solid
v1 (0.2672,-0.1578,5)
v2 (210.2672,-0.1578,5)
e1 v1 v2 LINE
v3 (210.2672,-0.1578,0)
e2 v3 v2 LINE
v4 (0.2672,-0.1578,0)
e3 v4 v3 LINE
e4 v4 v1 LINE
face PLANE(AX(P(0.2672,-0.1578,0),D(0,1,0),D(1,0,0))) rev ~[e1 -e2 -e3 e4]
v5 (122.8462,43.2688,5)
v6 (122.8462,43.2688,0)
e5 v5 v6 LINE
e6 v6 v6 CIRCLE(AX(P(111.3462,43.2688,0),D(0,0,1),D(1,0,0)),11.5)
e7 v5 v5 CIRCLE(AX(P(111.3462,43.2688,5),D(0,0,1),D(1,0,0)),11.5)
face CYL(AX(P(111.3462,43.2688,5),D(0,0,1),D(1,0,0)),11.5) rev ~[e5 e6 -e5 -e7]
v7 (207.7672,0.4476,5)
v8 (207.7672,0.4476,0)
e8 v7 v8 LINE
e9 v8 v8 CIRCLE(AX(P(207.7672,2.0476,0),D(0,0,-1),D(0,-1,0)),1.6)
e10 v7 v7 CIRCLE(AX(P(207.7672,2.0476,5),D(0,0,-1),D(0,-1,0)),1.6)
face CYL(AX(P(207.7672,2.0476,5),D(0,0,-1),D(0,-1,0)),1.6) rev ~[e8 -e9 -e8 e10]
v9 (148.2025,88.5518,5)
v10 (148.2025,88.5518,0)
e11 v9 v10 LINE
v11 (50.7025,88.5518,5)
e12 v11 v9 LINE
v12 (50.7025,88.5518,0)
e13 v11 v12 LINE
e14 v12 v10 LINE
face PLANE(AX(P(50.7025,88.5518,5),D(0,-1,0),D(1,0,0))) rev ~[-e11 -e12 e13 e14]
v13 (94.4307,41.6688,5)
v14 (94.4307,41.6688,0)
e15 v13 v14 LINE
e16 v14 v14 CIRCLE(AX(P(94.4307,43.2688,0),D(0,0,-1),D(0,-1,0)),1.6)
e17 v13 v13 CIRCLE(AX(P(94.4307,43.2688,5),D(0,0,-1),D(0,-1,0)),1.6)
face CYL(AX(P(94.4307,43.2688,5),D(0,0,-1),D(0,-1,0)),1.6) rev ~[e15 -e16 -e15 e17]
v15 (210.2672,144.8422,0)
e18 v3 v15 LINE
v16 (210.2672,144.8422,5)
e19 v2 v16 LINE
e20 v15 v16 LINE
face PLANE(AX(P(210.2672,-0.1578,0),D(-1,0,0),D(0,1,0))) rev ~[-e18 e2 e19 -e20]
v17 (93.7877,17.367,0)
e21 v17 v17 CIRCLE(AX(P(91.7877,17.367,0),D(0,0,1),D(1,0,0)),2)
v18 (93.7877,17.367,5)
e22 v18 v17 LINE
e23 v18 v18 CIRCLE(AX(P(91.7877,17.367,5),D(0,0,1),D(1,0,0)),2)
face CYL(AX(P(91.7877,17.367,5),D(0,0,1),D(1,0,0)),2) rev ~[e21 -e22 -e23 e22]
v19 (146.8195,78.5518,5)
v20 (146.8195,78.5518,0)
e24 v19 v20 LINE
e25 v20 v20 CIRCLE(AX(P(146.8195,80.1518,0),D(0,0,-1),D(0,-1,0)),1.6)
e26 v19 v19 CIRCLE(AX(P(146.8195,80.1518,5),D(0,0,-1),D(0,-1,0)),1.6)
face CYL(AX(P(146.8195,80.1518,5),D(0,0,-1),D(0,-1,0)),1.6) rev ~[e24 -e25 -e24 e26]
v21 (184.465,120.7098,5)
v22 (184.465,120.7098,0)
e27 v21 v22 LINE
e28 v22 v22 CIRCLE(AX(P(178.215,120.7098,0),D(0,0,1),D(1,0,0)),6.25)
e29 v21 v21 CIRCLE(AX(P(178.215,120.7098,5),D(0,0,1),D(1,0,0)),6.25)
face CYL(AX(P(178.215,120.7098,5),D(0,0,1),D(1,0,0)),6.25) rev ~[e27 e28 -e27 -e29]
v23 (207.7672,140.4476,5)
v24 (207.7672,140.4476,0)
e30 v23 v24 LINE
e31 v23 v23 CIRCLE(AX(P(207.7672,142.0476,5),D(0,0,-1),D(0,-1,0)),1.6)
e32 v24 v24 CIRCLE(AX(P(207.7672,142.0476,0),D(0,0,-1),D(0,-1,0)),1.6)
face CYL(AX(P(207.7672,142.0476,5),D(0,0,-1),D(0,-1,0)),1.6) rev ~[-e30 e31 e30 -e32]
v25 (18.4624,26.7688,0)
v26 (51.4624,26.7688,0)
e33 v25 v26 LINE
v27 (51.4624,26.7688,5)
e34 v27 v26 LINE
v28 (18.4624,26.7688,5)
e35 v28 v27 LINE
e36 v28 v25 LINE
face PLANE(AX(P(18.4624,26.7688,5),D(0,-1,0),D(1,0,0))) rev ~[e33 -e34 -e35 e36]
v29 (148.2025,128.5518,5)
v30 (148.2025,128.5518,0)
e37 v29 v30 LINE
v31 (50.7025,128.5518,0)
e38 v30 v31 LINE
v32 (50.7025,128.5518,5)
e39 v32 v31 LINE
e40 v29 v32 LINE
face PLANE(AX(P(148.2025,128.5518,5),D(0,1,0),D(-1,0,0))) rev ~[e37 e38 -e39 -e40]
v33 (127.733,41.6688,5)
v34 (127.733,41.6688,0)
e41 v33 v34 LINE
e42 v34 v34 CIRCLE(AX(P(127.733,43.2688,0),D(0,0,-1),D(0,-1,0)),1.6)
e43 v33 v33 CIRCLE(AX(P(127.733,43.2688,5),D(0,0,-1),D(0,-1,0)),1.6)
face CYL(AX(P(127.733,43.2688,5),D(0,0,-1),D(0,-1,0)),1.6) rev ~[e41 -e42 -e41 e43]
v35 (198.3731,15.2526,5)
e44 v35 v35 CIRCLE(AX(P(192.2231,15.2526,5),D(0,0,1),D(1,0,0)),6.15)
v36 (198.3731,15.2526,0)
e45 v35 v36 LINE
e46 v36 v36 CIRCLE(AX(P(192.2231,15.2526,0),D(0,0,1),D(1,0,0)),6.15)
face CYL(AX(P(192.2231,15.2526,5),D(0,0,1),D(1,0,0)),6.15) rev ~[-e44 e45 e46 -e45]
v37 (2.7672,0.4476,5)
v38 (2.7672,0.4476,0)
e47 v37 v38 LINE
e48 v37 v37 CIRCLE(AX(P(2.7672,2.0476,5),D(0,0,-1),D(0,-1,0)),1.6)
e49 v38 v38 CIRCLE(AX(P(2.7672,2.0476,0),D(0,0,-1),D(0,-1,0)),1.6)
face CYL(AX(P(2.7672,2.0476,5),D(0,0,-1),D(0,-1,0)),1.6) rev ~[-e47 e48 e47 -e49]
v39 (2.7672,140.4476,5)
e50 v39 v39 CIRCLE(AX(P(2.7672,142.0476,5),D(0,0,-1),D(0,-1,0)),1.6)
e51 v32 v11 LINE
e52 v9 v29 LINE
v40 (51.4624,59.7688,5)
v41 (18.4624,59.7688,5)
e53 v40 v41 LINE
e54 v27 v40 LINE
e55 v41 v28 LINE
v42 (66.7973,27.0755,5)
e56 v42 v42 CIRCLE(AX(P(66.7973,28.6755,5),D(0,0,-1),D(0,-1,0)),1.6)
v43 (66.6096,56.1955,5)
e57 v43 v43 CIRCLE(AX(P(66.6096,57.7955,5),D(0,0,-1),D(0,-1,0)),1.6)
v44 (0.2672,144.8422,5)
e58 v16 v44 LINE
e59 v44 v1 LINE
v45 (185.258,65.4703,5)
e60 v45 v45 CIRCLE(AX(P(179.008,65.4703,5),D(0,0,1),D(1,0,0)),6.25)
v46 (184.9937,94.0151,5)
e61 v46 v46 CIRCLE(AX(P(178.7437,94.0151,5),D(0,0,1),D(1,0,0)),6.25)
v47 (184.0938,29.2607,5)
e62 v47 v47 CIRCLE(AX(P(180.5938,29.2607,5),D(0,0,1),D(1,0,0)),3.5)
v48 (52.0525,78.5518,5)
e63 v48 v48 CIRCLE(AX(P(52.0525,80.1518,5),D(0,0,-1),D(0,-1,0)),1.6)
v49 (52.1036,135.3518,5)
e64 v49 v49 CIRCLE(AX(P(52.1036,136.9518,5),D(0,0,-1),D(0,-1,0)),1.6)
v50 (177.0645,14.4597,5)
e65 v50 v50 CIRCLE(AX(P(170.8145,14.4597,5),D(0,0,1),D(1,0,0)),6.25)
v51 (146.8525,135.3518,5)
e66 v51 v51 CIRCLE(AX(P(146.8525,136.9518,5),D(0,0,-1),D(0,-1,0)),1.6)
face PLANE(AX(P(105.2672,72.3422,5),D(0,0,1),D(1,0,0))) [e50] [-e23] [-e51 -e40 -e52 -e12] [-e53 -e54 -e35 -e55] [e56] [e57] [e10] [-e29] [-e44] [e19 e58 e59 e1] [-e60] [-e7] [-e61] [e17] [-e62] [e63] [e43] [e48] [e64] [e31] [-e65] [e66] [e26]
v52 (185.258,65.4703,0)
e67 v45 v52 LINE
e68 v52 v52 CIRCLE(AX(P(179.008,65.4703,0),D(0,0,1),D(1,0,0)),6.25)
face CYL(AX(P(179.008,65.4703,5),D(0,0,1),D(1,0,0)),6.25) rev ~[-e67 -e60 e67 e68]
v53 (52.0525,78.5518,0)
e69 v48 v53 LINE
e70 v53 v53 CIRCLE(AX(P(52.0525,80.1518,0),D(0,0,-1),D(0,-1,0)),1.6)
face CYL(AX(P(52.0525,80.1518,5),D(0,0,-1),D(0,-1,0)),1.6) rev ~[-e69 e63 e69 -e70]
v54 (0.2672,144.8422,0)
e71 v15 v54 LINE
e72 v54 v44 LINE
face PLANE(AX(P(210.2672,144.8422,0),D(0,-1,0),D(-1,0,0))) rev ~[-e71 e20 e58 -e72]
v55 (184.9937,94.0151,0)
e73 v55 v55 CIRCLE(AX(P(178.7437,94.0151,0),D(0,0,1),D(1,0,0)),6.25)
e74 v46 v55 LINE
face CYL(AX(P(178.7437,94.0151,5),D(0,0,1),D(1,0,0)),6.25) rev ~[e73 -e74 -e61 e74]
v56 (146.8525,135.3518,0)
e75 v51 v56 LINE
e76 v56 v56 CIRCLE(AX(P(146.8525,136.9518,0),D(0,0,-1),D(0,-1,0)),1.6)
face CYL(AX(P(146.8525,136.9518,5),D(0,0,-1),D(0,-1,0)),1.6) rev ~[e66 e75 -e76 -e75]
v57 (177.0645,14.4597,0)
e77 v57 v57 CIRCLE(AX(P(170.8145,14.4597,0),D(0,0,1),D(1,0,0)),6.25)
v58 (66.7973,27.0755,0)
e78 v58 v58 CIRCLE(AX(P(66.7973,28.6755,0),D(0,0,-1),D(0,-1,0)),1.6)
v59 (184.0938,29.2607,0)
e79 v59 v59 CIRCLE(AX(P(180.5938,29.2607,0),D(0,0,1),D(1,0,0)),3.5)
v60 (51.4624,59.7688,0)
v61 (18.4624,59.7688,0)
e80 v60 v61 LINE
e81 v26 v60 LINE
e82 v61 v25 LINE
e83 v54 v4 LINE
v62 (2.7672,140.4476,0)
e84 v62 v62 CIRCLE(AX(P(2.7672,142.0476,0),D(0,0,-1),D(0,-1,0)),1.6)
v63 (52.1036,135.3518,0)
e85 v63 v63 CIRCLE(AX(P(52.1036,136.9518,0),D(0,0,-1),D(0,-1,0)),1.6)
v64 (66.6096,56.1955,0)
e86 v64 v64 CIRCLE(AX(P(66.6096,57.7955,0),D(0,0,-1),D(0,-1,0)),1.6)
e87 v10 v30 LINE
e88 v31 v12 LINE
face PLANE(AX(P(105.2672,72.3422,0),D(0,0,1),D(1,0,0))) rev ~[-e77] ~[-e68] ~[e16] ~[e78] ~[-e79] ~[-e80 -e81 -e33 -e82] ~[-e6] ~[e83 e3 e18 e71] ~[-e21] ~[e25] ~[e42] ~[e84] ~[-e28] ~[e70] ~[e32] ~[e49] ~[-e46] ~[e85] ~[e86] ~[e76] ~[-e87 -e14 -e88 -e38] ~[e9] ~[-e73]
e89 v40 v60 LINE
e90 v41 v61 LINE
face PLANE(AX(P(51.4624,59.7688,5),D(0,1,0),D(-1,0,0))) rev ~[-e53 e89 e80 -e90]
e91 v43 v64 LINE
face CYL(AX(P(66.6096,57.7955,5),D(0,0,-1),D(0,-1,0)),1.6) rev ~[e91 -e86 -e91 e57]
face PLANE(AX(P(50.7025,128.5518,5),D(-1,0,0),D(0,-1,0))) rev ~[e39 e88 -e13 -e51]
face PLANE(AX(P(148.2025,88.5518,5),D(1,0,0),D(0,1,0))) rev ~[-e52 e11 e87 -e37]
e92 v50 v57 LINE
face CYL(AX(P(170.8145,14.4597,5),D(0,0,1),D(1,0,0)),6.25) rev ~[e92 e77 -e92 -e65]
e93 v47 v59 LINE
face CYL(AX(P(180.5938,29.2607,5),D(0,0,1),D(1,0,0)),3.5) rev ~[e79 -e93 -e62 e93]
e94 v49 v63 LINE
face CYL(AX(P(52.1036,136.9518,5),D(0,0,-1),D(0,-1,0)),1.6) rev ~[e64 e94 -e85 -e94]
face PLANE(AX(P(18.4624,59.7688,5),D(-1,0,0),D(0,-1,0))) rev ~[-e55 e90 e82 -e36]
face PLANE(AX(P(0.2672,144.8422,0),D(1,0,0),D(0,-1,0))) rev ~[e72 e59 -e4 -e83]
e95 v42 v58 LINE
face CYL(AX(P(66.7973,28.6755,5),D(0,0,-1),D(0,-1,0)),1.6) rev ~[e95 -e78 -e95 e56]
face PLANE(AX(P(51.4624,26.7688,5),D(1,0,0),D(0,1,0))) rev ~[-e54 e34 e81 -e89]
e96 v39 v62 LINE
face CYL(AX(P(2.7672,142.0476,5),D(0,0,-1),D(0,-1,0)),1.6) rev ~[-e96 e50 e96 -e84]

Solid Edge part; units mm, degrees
sketch "Sketch1" plane through (0, 0, 0) normal (0, 0, 1) x (1, 0, 0)
  line L0 (210.2672, -0.1578) -> (210.2672, 144.8422)
  line L1 (210.2672, 144.8422) -> (0.2672, 144.8422)
  line L2 (0.2672, 144.8422) -> (0.2672, -0.1578)
  line L3 (0.2672, -0.1578) -> (210.2672, -0.1578)
extrude "Protrusion1" add sketch "Sketch1" along normal blind 5
hole "Hole_3" at (52.1036, 136.9518, 5) direction (0, 0, -1) diameter 3.2 depth 50.8
hole "Hole1" at (146.8525, 136.9518, 5) direction (0, 0, -1) diameter 3.2 depth 50.8
hole "Hole2" at (146.8195, 80.1518, 5) direction (0, 0, -1) diameter 3.2 depth 50.8
hole "Hole3" at (52.0525, 80.1518, 5) direction (0, 0, -1) diameter 3.2 depth 50.8
sketch "Sketch2" plane through (105.2672, 72.3422, 5) normal (0, 0, 1) x (1, 0, 0)
  line L0 (-54.5647, 16.2096) -> (42.9353, 16.2096)
  line L1 (42.9353, 16.2096) -> (42.9353, 56.2096)
  line L2 (42.9353, 56.2096) -> (-54.5647, 56.2096)
  line L3 (-54.5647, 56.2096) -> (-54.5647, 16.2096)
extrude "ExtrudedCutout_1" cut sketch "Sketch2" against normal blind 5
sketch "Sketch3" plane through (105.2672, 72.3422, 5) normal (0, 0, 1) x (1, 0, 0)
  circle A0 centre (86.9559, -57.0896) radius 6.15
extrude "ExtrudedCutout_2" cut sketch "Sketch3" against normal blind 5
sketch "Sketch4" plane through (105.2672, 72.3422, 5) normal (0, 0, 1) x (1, 0, 0)
  circle A0 centre (65.5473, -57.8825) radius 6.25
extrude "ExtrudedCutout_3" cut sketch "Sketch4" against normal blind 5
sketch "Sketch5" plane through (105.2672, 72.3422, 5) normal (0, 0, 1) x (1, 0, 0)
  circle A0 centre (75.3266, -43.0815) radius 3.5
extrude "ExtrudedCutout_4" cut sketch "Sketch5" against normal blind 5
hole "Hole_7" at (66.6096, 57.7955, 5) direction (0, 0, -1) diameter 3.2 depth 50.8
hole "Hole_8" at (66.7973, 28.6755, 5) direction (0, 0, -1) diameter 3.2 depth 50.8
sketch "Sketch6" plane through (105.2672, 72.3422, 5) normal (0, 0, 1) x (1, 0, 0)
  line L0 (-53.8048, -45.5734) -> (-53.8048, -12.5734)
  line L1 (-53.8048, -12.5734) -> (-86.8048, -12.5734)
  line L2 (-86.8048, -12.5734) -> (-86.8048, -45.5734)
  line L3 (-86.8048, -45.5734) -> (-53.8048, -45.5734)
extrude "ExtrudedCutout_5" cut sketch "Sketch6" against normal blind 5
sketch "Sketch7" plane through (105.2672, 72.3422, 5) normal (0, 0, 1) x (1, 0, 0)
  circle A0 centre (72.9478, 48.3676) radius 6.25
  circle A1 centre (72.9478, 48.3676) radius 6.25
  dimension "D1" = 12.5
  dimension "D2" = 12.5
  dimension "D3" = 12.5
  dimension "D4" = 12.5
  dimension "D5" = 12.5
  dimension "D6" = 12.5
extrude "ExtrudedCutout_6" cut sketch "Sketch7" against normal blind 5
sketch "Sketch8" plane through (105.2672, 72.3422, 5) normal (0, 0, 1) x (1, 0, 0)
  circle A0 centre (73.4765, 21.6729) radius 6.25
extrude "ExtrudedCutout_7" cut sketch "Sketch8" against normal blind 5
sketch "Sketch9" plane through (105.2672, 72.3422, 5) normal (0, 0, 1) x (1, 0, 0)
  circle A0 centre (73.7408, -6.8719) radius 6.25
extrude "ExtrudedCutout_8" cut sketch "Sketch9" against normal blind 5
sketch "Sketch10" plane through (105.2672, 72.3422, 5) normal (0, 0, 1) x (1, 0, 0)
  circle A0 centre (6.079, -29.0734) radius 11.5
extrude "ExtrudedCutout_10" cut sketch "Sketch10" against normal blind 5
sketch "Sketch11" plane through (105.2672, 72.3422, 5) normal (0, 0, 1) x (1, 0, 0)
  circle A0 centre (-13.4795, -54.9752) radius 2
extrude "ExtrudedCutout_11" cut sketch "Sketch11" against normal blind 5
hole "Hole_11" at (94.4307, 43.2688, 5) direction (0, 0, -1) diameter 3.2 depth 50.8
hole "Hole4" at (127.733, 43.2688, 5) direction (0, 0, -1) diameter 3.2 depth 50.8
hole "Hole_13" at (2.7672, 142.0476, 5) direction (0, 0, -1) diameter 3.2 depth 50.8
hole "Hole5" at (207.7672, 142.0476, 5) direction (0, 0, -1) diameter 3.2 depth 50.8
hole "Hole6" at (207.7672, 2.0476, 5) direction (0, 0, -1) diameter 3.2 depth 50.8
hole "Hole7" at (2.7672, 2.0476, 5) direction (0, 0, -1) diameter 3.2 depth 50.8
